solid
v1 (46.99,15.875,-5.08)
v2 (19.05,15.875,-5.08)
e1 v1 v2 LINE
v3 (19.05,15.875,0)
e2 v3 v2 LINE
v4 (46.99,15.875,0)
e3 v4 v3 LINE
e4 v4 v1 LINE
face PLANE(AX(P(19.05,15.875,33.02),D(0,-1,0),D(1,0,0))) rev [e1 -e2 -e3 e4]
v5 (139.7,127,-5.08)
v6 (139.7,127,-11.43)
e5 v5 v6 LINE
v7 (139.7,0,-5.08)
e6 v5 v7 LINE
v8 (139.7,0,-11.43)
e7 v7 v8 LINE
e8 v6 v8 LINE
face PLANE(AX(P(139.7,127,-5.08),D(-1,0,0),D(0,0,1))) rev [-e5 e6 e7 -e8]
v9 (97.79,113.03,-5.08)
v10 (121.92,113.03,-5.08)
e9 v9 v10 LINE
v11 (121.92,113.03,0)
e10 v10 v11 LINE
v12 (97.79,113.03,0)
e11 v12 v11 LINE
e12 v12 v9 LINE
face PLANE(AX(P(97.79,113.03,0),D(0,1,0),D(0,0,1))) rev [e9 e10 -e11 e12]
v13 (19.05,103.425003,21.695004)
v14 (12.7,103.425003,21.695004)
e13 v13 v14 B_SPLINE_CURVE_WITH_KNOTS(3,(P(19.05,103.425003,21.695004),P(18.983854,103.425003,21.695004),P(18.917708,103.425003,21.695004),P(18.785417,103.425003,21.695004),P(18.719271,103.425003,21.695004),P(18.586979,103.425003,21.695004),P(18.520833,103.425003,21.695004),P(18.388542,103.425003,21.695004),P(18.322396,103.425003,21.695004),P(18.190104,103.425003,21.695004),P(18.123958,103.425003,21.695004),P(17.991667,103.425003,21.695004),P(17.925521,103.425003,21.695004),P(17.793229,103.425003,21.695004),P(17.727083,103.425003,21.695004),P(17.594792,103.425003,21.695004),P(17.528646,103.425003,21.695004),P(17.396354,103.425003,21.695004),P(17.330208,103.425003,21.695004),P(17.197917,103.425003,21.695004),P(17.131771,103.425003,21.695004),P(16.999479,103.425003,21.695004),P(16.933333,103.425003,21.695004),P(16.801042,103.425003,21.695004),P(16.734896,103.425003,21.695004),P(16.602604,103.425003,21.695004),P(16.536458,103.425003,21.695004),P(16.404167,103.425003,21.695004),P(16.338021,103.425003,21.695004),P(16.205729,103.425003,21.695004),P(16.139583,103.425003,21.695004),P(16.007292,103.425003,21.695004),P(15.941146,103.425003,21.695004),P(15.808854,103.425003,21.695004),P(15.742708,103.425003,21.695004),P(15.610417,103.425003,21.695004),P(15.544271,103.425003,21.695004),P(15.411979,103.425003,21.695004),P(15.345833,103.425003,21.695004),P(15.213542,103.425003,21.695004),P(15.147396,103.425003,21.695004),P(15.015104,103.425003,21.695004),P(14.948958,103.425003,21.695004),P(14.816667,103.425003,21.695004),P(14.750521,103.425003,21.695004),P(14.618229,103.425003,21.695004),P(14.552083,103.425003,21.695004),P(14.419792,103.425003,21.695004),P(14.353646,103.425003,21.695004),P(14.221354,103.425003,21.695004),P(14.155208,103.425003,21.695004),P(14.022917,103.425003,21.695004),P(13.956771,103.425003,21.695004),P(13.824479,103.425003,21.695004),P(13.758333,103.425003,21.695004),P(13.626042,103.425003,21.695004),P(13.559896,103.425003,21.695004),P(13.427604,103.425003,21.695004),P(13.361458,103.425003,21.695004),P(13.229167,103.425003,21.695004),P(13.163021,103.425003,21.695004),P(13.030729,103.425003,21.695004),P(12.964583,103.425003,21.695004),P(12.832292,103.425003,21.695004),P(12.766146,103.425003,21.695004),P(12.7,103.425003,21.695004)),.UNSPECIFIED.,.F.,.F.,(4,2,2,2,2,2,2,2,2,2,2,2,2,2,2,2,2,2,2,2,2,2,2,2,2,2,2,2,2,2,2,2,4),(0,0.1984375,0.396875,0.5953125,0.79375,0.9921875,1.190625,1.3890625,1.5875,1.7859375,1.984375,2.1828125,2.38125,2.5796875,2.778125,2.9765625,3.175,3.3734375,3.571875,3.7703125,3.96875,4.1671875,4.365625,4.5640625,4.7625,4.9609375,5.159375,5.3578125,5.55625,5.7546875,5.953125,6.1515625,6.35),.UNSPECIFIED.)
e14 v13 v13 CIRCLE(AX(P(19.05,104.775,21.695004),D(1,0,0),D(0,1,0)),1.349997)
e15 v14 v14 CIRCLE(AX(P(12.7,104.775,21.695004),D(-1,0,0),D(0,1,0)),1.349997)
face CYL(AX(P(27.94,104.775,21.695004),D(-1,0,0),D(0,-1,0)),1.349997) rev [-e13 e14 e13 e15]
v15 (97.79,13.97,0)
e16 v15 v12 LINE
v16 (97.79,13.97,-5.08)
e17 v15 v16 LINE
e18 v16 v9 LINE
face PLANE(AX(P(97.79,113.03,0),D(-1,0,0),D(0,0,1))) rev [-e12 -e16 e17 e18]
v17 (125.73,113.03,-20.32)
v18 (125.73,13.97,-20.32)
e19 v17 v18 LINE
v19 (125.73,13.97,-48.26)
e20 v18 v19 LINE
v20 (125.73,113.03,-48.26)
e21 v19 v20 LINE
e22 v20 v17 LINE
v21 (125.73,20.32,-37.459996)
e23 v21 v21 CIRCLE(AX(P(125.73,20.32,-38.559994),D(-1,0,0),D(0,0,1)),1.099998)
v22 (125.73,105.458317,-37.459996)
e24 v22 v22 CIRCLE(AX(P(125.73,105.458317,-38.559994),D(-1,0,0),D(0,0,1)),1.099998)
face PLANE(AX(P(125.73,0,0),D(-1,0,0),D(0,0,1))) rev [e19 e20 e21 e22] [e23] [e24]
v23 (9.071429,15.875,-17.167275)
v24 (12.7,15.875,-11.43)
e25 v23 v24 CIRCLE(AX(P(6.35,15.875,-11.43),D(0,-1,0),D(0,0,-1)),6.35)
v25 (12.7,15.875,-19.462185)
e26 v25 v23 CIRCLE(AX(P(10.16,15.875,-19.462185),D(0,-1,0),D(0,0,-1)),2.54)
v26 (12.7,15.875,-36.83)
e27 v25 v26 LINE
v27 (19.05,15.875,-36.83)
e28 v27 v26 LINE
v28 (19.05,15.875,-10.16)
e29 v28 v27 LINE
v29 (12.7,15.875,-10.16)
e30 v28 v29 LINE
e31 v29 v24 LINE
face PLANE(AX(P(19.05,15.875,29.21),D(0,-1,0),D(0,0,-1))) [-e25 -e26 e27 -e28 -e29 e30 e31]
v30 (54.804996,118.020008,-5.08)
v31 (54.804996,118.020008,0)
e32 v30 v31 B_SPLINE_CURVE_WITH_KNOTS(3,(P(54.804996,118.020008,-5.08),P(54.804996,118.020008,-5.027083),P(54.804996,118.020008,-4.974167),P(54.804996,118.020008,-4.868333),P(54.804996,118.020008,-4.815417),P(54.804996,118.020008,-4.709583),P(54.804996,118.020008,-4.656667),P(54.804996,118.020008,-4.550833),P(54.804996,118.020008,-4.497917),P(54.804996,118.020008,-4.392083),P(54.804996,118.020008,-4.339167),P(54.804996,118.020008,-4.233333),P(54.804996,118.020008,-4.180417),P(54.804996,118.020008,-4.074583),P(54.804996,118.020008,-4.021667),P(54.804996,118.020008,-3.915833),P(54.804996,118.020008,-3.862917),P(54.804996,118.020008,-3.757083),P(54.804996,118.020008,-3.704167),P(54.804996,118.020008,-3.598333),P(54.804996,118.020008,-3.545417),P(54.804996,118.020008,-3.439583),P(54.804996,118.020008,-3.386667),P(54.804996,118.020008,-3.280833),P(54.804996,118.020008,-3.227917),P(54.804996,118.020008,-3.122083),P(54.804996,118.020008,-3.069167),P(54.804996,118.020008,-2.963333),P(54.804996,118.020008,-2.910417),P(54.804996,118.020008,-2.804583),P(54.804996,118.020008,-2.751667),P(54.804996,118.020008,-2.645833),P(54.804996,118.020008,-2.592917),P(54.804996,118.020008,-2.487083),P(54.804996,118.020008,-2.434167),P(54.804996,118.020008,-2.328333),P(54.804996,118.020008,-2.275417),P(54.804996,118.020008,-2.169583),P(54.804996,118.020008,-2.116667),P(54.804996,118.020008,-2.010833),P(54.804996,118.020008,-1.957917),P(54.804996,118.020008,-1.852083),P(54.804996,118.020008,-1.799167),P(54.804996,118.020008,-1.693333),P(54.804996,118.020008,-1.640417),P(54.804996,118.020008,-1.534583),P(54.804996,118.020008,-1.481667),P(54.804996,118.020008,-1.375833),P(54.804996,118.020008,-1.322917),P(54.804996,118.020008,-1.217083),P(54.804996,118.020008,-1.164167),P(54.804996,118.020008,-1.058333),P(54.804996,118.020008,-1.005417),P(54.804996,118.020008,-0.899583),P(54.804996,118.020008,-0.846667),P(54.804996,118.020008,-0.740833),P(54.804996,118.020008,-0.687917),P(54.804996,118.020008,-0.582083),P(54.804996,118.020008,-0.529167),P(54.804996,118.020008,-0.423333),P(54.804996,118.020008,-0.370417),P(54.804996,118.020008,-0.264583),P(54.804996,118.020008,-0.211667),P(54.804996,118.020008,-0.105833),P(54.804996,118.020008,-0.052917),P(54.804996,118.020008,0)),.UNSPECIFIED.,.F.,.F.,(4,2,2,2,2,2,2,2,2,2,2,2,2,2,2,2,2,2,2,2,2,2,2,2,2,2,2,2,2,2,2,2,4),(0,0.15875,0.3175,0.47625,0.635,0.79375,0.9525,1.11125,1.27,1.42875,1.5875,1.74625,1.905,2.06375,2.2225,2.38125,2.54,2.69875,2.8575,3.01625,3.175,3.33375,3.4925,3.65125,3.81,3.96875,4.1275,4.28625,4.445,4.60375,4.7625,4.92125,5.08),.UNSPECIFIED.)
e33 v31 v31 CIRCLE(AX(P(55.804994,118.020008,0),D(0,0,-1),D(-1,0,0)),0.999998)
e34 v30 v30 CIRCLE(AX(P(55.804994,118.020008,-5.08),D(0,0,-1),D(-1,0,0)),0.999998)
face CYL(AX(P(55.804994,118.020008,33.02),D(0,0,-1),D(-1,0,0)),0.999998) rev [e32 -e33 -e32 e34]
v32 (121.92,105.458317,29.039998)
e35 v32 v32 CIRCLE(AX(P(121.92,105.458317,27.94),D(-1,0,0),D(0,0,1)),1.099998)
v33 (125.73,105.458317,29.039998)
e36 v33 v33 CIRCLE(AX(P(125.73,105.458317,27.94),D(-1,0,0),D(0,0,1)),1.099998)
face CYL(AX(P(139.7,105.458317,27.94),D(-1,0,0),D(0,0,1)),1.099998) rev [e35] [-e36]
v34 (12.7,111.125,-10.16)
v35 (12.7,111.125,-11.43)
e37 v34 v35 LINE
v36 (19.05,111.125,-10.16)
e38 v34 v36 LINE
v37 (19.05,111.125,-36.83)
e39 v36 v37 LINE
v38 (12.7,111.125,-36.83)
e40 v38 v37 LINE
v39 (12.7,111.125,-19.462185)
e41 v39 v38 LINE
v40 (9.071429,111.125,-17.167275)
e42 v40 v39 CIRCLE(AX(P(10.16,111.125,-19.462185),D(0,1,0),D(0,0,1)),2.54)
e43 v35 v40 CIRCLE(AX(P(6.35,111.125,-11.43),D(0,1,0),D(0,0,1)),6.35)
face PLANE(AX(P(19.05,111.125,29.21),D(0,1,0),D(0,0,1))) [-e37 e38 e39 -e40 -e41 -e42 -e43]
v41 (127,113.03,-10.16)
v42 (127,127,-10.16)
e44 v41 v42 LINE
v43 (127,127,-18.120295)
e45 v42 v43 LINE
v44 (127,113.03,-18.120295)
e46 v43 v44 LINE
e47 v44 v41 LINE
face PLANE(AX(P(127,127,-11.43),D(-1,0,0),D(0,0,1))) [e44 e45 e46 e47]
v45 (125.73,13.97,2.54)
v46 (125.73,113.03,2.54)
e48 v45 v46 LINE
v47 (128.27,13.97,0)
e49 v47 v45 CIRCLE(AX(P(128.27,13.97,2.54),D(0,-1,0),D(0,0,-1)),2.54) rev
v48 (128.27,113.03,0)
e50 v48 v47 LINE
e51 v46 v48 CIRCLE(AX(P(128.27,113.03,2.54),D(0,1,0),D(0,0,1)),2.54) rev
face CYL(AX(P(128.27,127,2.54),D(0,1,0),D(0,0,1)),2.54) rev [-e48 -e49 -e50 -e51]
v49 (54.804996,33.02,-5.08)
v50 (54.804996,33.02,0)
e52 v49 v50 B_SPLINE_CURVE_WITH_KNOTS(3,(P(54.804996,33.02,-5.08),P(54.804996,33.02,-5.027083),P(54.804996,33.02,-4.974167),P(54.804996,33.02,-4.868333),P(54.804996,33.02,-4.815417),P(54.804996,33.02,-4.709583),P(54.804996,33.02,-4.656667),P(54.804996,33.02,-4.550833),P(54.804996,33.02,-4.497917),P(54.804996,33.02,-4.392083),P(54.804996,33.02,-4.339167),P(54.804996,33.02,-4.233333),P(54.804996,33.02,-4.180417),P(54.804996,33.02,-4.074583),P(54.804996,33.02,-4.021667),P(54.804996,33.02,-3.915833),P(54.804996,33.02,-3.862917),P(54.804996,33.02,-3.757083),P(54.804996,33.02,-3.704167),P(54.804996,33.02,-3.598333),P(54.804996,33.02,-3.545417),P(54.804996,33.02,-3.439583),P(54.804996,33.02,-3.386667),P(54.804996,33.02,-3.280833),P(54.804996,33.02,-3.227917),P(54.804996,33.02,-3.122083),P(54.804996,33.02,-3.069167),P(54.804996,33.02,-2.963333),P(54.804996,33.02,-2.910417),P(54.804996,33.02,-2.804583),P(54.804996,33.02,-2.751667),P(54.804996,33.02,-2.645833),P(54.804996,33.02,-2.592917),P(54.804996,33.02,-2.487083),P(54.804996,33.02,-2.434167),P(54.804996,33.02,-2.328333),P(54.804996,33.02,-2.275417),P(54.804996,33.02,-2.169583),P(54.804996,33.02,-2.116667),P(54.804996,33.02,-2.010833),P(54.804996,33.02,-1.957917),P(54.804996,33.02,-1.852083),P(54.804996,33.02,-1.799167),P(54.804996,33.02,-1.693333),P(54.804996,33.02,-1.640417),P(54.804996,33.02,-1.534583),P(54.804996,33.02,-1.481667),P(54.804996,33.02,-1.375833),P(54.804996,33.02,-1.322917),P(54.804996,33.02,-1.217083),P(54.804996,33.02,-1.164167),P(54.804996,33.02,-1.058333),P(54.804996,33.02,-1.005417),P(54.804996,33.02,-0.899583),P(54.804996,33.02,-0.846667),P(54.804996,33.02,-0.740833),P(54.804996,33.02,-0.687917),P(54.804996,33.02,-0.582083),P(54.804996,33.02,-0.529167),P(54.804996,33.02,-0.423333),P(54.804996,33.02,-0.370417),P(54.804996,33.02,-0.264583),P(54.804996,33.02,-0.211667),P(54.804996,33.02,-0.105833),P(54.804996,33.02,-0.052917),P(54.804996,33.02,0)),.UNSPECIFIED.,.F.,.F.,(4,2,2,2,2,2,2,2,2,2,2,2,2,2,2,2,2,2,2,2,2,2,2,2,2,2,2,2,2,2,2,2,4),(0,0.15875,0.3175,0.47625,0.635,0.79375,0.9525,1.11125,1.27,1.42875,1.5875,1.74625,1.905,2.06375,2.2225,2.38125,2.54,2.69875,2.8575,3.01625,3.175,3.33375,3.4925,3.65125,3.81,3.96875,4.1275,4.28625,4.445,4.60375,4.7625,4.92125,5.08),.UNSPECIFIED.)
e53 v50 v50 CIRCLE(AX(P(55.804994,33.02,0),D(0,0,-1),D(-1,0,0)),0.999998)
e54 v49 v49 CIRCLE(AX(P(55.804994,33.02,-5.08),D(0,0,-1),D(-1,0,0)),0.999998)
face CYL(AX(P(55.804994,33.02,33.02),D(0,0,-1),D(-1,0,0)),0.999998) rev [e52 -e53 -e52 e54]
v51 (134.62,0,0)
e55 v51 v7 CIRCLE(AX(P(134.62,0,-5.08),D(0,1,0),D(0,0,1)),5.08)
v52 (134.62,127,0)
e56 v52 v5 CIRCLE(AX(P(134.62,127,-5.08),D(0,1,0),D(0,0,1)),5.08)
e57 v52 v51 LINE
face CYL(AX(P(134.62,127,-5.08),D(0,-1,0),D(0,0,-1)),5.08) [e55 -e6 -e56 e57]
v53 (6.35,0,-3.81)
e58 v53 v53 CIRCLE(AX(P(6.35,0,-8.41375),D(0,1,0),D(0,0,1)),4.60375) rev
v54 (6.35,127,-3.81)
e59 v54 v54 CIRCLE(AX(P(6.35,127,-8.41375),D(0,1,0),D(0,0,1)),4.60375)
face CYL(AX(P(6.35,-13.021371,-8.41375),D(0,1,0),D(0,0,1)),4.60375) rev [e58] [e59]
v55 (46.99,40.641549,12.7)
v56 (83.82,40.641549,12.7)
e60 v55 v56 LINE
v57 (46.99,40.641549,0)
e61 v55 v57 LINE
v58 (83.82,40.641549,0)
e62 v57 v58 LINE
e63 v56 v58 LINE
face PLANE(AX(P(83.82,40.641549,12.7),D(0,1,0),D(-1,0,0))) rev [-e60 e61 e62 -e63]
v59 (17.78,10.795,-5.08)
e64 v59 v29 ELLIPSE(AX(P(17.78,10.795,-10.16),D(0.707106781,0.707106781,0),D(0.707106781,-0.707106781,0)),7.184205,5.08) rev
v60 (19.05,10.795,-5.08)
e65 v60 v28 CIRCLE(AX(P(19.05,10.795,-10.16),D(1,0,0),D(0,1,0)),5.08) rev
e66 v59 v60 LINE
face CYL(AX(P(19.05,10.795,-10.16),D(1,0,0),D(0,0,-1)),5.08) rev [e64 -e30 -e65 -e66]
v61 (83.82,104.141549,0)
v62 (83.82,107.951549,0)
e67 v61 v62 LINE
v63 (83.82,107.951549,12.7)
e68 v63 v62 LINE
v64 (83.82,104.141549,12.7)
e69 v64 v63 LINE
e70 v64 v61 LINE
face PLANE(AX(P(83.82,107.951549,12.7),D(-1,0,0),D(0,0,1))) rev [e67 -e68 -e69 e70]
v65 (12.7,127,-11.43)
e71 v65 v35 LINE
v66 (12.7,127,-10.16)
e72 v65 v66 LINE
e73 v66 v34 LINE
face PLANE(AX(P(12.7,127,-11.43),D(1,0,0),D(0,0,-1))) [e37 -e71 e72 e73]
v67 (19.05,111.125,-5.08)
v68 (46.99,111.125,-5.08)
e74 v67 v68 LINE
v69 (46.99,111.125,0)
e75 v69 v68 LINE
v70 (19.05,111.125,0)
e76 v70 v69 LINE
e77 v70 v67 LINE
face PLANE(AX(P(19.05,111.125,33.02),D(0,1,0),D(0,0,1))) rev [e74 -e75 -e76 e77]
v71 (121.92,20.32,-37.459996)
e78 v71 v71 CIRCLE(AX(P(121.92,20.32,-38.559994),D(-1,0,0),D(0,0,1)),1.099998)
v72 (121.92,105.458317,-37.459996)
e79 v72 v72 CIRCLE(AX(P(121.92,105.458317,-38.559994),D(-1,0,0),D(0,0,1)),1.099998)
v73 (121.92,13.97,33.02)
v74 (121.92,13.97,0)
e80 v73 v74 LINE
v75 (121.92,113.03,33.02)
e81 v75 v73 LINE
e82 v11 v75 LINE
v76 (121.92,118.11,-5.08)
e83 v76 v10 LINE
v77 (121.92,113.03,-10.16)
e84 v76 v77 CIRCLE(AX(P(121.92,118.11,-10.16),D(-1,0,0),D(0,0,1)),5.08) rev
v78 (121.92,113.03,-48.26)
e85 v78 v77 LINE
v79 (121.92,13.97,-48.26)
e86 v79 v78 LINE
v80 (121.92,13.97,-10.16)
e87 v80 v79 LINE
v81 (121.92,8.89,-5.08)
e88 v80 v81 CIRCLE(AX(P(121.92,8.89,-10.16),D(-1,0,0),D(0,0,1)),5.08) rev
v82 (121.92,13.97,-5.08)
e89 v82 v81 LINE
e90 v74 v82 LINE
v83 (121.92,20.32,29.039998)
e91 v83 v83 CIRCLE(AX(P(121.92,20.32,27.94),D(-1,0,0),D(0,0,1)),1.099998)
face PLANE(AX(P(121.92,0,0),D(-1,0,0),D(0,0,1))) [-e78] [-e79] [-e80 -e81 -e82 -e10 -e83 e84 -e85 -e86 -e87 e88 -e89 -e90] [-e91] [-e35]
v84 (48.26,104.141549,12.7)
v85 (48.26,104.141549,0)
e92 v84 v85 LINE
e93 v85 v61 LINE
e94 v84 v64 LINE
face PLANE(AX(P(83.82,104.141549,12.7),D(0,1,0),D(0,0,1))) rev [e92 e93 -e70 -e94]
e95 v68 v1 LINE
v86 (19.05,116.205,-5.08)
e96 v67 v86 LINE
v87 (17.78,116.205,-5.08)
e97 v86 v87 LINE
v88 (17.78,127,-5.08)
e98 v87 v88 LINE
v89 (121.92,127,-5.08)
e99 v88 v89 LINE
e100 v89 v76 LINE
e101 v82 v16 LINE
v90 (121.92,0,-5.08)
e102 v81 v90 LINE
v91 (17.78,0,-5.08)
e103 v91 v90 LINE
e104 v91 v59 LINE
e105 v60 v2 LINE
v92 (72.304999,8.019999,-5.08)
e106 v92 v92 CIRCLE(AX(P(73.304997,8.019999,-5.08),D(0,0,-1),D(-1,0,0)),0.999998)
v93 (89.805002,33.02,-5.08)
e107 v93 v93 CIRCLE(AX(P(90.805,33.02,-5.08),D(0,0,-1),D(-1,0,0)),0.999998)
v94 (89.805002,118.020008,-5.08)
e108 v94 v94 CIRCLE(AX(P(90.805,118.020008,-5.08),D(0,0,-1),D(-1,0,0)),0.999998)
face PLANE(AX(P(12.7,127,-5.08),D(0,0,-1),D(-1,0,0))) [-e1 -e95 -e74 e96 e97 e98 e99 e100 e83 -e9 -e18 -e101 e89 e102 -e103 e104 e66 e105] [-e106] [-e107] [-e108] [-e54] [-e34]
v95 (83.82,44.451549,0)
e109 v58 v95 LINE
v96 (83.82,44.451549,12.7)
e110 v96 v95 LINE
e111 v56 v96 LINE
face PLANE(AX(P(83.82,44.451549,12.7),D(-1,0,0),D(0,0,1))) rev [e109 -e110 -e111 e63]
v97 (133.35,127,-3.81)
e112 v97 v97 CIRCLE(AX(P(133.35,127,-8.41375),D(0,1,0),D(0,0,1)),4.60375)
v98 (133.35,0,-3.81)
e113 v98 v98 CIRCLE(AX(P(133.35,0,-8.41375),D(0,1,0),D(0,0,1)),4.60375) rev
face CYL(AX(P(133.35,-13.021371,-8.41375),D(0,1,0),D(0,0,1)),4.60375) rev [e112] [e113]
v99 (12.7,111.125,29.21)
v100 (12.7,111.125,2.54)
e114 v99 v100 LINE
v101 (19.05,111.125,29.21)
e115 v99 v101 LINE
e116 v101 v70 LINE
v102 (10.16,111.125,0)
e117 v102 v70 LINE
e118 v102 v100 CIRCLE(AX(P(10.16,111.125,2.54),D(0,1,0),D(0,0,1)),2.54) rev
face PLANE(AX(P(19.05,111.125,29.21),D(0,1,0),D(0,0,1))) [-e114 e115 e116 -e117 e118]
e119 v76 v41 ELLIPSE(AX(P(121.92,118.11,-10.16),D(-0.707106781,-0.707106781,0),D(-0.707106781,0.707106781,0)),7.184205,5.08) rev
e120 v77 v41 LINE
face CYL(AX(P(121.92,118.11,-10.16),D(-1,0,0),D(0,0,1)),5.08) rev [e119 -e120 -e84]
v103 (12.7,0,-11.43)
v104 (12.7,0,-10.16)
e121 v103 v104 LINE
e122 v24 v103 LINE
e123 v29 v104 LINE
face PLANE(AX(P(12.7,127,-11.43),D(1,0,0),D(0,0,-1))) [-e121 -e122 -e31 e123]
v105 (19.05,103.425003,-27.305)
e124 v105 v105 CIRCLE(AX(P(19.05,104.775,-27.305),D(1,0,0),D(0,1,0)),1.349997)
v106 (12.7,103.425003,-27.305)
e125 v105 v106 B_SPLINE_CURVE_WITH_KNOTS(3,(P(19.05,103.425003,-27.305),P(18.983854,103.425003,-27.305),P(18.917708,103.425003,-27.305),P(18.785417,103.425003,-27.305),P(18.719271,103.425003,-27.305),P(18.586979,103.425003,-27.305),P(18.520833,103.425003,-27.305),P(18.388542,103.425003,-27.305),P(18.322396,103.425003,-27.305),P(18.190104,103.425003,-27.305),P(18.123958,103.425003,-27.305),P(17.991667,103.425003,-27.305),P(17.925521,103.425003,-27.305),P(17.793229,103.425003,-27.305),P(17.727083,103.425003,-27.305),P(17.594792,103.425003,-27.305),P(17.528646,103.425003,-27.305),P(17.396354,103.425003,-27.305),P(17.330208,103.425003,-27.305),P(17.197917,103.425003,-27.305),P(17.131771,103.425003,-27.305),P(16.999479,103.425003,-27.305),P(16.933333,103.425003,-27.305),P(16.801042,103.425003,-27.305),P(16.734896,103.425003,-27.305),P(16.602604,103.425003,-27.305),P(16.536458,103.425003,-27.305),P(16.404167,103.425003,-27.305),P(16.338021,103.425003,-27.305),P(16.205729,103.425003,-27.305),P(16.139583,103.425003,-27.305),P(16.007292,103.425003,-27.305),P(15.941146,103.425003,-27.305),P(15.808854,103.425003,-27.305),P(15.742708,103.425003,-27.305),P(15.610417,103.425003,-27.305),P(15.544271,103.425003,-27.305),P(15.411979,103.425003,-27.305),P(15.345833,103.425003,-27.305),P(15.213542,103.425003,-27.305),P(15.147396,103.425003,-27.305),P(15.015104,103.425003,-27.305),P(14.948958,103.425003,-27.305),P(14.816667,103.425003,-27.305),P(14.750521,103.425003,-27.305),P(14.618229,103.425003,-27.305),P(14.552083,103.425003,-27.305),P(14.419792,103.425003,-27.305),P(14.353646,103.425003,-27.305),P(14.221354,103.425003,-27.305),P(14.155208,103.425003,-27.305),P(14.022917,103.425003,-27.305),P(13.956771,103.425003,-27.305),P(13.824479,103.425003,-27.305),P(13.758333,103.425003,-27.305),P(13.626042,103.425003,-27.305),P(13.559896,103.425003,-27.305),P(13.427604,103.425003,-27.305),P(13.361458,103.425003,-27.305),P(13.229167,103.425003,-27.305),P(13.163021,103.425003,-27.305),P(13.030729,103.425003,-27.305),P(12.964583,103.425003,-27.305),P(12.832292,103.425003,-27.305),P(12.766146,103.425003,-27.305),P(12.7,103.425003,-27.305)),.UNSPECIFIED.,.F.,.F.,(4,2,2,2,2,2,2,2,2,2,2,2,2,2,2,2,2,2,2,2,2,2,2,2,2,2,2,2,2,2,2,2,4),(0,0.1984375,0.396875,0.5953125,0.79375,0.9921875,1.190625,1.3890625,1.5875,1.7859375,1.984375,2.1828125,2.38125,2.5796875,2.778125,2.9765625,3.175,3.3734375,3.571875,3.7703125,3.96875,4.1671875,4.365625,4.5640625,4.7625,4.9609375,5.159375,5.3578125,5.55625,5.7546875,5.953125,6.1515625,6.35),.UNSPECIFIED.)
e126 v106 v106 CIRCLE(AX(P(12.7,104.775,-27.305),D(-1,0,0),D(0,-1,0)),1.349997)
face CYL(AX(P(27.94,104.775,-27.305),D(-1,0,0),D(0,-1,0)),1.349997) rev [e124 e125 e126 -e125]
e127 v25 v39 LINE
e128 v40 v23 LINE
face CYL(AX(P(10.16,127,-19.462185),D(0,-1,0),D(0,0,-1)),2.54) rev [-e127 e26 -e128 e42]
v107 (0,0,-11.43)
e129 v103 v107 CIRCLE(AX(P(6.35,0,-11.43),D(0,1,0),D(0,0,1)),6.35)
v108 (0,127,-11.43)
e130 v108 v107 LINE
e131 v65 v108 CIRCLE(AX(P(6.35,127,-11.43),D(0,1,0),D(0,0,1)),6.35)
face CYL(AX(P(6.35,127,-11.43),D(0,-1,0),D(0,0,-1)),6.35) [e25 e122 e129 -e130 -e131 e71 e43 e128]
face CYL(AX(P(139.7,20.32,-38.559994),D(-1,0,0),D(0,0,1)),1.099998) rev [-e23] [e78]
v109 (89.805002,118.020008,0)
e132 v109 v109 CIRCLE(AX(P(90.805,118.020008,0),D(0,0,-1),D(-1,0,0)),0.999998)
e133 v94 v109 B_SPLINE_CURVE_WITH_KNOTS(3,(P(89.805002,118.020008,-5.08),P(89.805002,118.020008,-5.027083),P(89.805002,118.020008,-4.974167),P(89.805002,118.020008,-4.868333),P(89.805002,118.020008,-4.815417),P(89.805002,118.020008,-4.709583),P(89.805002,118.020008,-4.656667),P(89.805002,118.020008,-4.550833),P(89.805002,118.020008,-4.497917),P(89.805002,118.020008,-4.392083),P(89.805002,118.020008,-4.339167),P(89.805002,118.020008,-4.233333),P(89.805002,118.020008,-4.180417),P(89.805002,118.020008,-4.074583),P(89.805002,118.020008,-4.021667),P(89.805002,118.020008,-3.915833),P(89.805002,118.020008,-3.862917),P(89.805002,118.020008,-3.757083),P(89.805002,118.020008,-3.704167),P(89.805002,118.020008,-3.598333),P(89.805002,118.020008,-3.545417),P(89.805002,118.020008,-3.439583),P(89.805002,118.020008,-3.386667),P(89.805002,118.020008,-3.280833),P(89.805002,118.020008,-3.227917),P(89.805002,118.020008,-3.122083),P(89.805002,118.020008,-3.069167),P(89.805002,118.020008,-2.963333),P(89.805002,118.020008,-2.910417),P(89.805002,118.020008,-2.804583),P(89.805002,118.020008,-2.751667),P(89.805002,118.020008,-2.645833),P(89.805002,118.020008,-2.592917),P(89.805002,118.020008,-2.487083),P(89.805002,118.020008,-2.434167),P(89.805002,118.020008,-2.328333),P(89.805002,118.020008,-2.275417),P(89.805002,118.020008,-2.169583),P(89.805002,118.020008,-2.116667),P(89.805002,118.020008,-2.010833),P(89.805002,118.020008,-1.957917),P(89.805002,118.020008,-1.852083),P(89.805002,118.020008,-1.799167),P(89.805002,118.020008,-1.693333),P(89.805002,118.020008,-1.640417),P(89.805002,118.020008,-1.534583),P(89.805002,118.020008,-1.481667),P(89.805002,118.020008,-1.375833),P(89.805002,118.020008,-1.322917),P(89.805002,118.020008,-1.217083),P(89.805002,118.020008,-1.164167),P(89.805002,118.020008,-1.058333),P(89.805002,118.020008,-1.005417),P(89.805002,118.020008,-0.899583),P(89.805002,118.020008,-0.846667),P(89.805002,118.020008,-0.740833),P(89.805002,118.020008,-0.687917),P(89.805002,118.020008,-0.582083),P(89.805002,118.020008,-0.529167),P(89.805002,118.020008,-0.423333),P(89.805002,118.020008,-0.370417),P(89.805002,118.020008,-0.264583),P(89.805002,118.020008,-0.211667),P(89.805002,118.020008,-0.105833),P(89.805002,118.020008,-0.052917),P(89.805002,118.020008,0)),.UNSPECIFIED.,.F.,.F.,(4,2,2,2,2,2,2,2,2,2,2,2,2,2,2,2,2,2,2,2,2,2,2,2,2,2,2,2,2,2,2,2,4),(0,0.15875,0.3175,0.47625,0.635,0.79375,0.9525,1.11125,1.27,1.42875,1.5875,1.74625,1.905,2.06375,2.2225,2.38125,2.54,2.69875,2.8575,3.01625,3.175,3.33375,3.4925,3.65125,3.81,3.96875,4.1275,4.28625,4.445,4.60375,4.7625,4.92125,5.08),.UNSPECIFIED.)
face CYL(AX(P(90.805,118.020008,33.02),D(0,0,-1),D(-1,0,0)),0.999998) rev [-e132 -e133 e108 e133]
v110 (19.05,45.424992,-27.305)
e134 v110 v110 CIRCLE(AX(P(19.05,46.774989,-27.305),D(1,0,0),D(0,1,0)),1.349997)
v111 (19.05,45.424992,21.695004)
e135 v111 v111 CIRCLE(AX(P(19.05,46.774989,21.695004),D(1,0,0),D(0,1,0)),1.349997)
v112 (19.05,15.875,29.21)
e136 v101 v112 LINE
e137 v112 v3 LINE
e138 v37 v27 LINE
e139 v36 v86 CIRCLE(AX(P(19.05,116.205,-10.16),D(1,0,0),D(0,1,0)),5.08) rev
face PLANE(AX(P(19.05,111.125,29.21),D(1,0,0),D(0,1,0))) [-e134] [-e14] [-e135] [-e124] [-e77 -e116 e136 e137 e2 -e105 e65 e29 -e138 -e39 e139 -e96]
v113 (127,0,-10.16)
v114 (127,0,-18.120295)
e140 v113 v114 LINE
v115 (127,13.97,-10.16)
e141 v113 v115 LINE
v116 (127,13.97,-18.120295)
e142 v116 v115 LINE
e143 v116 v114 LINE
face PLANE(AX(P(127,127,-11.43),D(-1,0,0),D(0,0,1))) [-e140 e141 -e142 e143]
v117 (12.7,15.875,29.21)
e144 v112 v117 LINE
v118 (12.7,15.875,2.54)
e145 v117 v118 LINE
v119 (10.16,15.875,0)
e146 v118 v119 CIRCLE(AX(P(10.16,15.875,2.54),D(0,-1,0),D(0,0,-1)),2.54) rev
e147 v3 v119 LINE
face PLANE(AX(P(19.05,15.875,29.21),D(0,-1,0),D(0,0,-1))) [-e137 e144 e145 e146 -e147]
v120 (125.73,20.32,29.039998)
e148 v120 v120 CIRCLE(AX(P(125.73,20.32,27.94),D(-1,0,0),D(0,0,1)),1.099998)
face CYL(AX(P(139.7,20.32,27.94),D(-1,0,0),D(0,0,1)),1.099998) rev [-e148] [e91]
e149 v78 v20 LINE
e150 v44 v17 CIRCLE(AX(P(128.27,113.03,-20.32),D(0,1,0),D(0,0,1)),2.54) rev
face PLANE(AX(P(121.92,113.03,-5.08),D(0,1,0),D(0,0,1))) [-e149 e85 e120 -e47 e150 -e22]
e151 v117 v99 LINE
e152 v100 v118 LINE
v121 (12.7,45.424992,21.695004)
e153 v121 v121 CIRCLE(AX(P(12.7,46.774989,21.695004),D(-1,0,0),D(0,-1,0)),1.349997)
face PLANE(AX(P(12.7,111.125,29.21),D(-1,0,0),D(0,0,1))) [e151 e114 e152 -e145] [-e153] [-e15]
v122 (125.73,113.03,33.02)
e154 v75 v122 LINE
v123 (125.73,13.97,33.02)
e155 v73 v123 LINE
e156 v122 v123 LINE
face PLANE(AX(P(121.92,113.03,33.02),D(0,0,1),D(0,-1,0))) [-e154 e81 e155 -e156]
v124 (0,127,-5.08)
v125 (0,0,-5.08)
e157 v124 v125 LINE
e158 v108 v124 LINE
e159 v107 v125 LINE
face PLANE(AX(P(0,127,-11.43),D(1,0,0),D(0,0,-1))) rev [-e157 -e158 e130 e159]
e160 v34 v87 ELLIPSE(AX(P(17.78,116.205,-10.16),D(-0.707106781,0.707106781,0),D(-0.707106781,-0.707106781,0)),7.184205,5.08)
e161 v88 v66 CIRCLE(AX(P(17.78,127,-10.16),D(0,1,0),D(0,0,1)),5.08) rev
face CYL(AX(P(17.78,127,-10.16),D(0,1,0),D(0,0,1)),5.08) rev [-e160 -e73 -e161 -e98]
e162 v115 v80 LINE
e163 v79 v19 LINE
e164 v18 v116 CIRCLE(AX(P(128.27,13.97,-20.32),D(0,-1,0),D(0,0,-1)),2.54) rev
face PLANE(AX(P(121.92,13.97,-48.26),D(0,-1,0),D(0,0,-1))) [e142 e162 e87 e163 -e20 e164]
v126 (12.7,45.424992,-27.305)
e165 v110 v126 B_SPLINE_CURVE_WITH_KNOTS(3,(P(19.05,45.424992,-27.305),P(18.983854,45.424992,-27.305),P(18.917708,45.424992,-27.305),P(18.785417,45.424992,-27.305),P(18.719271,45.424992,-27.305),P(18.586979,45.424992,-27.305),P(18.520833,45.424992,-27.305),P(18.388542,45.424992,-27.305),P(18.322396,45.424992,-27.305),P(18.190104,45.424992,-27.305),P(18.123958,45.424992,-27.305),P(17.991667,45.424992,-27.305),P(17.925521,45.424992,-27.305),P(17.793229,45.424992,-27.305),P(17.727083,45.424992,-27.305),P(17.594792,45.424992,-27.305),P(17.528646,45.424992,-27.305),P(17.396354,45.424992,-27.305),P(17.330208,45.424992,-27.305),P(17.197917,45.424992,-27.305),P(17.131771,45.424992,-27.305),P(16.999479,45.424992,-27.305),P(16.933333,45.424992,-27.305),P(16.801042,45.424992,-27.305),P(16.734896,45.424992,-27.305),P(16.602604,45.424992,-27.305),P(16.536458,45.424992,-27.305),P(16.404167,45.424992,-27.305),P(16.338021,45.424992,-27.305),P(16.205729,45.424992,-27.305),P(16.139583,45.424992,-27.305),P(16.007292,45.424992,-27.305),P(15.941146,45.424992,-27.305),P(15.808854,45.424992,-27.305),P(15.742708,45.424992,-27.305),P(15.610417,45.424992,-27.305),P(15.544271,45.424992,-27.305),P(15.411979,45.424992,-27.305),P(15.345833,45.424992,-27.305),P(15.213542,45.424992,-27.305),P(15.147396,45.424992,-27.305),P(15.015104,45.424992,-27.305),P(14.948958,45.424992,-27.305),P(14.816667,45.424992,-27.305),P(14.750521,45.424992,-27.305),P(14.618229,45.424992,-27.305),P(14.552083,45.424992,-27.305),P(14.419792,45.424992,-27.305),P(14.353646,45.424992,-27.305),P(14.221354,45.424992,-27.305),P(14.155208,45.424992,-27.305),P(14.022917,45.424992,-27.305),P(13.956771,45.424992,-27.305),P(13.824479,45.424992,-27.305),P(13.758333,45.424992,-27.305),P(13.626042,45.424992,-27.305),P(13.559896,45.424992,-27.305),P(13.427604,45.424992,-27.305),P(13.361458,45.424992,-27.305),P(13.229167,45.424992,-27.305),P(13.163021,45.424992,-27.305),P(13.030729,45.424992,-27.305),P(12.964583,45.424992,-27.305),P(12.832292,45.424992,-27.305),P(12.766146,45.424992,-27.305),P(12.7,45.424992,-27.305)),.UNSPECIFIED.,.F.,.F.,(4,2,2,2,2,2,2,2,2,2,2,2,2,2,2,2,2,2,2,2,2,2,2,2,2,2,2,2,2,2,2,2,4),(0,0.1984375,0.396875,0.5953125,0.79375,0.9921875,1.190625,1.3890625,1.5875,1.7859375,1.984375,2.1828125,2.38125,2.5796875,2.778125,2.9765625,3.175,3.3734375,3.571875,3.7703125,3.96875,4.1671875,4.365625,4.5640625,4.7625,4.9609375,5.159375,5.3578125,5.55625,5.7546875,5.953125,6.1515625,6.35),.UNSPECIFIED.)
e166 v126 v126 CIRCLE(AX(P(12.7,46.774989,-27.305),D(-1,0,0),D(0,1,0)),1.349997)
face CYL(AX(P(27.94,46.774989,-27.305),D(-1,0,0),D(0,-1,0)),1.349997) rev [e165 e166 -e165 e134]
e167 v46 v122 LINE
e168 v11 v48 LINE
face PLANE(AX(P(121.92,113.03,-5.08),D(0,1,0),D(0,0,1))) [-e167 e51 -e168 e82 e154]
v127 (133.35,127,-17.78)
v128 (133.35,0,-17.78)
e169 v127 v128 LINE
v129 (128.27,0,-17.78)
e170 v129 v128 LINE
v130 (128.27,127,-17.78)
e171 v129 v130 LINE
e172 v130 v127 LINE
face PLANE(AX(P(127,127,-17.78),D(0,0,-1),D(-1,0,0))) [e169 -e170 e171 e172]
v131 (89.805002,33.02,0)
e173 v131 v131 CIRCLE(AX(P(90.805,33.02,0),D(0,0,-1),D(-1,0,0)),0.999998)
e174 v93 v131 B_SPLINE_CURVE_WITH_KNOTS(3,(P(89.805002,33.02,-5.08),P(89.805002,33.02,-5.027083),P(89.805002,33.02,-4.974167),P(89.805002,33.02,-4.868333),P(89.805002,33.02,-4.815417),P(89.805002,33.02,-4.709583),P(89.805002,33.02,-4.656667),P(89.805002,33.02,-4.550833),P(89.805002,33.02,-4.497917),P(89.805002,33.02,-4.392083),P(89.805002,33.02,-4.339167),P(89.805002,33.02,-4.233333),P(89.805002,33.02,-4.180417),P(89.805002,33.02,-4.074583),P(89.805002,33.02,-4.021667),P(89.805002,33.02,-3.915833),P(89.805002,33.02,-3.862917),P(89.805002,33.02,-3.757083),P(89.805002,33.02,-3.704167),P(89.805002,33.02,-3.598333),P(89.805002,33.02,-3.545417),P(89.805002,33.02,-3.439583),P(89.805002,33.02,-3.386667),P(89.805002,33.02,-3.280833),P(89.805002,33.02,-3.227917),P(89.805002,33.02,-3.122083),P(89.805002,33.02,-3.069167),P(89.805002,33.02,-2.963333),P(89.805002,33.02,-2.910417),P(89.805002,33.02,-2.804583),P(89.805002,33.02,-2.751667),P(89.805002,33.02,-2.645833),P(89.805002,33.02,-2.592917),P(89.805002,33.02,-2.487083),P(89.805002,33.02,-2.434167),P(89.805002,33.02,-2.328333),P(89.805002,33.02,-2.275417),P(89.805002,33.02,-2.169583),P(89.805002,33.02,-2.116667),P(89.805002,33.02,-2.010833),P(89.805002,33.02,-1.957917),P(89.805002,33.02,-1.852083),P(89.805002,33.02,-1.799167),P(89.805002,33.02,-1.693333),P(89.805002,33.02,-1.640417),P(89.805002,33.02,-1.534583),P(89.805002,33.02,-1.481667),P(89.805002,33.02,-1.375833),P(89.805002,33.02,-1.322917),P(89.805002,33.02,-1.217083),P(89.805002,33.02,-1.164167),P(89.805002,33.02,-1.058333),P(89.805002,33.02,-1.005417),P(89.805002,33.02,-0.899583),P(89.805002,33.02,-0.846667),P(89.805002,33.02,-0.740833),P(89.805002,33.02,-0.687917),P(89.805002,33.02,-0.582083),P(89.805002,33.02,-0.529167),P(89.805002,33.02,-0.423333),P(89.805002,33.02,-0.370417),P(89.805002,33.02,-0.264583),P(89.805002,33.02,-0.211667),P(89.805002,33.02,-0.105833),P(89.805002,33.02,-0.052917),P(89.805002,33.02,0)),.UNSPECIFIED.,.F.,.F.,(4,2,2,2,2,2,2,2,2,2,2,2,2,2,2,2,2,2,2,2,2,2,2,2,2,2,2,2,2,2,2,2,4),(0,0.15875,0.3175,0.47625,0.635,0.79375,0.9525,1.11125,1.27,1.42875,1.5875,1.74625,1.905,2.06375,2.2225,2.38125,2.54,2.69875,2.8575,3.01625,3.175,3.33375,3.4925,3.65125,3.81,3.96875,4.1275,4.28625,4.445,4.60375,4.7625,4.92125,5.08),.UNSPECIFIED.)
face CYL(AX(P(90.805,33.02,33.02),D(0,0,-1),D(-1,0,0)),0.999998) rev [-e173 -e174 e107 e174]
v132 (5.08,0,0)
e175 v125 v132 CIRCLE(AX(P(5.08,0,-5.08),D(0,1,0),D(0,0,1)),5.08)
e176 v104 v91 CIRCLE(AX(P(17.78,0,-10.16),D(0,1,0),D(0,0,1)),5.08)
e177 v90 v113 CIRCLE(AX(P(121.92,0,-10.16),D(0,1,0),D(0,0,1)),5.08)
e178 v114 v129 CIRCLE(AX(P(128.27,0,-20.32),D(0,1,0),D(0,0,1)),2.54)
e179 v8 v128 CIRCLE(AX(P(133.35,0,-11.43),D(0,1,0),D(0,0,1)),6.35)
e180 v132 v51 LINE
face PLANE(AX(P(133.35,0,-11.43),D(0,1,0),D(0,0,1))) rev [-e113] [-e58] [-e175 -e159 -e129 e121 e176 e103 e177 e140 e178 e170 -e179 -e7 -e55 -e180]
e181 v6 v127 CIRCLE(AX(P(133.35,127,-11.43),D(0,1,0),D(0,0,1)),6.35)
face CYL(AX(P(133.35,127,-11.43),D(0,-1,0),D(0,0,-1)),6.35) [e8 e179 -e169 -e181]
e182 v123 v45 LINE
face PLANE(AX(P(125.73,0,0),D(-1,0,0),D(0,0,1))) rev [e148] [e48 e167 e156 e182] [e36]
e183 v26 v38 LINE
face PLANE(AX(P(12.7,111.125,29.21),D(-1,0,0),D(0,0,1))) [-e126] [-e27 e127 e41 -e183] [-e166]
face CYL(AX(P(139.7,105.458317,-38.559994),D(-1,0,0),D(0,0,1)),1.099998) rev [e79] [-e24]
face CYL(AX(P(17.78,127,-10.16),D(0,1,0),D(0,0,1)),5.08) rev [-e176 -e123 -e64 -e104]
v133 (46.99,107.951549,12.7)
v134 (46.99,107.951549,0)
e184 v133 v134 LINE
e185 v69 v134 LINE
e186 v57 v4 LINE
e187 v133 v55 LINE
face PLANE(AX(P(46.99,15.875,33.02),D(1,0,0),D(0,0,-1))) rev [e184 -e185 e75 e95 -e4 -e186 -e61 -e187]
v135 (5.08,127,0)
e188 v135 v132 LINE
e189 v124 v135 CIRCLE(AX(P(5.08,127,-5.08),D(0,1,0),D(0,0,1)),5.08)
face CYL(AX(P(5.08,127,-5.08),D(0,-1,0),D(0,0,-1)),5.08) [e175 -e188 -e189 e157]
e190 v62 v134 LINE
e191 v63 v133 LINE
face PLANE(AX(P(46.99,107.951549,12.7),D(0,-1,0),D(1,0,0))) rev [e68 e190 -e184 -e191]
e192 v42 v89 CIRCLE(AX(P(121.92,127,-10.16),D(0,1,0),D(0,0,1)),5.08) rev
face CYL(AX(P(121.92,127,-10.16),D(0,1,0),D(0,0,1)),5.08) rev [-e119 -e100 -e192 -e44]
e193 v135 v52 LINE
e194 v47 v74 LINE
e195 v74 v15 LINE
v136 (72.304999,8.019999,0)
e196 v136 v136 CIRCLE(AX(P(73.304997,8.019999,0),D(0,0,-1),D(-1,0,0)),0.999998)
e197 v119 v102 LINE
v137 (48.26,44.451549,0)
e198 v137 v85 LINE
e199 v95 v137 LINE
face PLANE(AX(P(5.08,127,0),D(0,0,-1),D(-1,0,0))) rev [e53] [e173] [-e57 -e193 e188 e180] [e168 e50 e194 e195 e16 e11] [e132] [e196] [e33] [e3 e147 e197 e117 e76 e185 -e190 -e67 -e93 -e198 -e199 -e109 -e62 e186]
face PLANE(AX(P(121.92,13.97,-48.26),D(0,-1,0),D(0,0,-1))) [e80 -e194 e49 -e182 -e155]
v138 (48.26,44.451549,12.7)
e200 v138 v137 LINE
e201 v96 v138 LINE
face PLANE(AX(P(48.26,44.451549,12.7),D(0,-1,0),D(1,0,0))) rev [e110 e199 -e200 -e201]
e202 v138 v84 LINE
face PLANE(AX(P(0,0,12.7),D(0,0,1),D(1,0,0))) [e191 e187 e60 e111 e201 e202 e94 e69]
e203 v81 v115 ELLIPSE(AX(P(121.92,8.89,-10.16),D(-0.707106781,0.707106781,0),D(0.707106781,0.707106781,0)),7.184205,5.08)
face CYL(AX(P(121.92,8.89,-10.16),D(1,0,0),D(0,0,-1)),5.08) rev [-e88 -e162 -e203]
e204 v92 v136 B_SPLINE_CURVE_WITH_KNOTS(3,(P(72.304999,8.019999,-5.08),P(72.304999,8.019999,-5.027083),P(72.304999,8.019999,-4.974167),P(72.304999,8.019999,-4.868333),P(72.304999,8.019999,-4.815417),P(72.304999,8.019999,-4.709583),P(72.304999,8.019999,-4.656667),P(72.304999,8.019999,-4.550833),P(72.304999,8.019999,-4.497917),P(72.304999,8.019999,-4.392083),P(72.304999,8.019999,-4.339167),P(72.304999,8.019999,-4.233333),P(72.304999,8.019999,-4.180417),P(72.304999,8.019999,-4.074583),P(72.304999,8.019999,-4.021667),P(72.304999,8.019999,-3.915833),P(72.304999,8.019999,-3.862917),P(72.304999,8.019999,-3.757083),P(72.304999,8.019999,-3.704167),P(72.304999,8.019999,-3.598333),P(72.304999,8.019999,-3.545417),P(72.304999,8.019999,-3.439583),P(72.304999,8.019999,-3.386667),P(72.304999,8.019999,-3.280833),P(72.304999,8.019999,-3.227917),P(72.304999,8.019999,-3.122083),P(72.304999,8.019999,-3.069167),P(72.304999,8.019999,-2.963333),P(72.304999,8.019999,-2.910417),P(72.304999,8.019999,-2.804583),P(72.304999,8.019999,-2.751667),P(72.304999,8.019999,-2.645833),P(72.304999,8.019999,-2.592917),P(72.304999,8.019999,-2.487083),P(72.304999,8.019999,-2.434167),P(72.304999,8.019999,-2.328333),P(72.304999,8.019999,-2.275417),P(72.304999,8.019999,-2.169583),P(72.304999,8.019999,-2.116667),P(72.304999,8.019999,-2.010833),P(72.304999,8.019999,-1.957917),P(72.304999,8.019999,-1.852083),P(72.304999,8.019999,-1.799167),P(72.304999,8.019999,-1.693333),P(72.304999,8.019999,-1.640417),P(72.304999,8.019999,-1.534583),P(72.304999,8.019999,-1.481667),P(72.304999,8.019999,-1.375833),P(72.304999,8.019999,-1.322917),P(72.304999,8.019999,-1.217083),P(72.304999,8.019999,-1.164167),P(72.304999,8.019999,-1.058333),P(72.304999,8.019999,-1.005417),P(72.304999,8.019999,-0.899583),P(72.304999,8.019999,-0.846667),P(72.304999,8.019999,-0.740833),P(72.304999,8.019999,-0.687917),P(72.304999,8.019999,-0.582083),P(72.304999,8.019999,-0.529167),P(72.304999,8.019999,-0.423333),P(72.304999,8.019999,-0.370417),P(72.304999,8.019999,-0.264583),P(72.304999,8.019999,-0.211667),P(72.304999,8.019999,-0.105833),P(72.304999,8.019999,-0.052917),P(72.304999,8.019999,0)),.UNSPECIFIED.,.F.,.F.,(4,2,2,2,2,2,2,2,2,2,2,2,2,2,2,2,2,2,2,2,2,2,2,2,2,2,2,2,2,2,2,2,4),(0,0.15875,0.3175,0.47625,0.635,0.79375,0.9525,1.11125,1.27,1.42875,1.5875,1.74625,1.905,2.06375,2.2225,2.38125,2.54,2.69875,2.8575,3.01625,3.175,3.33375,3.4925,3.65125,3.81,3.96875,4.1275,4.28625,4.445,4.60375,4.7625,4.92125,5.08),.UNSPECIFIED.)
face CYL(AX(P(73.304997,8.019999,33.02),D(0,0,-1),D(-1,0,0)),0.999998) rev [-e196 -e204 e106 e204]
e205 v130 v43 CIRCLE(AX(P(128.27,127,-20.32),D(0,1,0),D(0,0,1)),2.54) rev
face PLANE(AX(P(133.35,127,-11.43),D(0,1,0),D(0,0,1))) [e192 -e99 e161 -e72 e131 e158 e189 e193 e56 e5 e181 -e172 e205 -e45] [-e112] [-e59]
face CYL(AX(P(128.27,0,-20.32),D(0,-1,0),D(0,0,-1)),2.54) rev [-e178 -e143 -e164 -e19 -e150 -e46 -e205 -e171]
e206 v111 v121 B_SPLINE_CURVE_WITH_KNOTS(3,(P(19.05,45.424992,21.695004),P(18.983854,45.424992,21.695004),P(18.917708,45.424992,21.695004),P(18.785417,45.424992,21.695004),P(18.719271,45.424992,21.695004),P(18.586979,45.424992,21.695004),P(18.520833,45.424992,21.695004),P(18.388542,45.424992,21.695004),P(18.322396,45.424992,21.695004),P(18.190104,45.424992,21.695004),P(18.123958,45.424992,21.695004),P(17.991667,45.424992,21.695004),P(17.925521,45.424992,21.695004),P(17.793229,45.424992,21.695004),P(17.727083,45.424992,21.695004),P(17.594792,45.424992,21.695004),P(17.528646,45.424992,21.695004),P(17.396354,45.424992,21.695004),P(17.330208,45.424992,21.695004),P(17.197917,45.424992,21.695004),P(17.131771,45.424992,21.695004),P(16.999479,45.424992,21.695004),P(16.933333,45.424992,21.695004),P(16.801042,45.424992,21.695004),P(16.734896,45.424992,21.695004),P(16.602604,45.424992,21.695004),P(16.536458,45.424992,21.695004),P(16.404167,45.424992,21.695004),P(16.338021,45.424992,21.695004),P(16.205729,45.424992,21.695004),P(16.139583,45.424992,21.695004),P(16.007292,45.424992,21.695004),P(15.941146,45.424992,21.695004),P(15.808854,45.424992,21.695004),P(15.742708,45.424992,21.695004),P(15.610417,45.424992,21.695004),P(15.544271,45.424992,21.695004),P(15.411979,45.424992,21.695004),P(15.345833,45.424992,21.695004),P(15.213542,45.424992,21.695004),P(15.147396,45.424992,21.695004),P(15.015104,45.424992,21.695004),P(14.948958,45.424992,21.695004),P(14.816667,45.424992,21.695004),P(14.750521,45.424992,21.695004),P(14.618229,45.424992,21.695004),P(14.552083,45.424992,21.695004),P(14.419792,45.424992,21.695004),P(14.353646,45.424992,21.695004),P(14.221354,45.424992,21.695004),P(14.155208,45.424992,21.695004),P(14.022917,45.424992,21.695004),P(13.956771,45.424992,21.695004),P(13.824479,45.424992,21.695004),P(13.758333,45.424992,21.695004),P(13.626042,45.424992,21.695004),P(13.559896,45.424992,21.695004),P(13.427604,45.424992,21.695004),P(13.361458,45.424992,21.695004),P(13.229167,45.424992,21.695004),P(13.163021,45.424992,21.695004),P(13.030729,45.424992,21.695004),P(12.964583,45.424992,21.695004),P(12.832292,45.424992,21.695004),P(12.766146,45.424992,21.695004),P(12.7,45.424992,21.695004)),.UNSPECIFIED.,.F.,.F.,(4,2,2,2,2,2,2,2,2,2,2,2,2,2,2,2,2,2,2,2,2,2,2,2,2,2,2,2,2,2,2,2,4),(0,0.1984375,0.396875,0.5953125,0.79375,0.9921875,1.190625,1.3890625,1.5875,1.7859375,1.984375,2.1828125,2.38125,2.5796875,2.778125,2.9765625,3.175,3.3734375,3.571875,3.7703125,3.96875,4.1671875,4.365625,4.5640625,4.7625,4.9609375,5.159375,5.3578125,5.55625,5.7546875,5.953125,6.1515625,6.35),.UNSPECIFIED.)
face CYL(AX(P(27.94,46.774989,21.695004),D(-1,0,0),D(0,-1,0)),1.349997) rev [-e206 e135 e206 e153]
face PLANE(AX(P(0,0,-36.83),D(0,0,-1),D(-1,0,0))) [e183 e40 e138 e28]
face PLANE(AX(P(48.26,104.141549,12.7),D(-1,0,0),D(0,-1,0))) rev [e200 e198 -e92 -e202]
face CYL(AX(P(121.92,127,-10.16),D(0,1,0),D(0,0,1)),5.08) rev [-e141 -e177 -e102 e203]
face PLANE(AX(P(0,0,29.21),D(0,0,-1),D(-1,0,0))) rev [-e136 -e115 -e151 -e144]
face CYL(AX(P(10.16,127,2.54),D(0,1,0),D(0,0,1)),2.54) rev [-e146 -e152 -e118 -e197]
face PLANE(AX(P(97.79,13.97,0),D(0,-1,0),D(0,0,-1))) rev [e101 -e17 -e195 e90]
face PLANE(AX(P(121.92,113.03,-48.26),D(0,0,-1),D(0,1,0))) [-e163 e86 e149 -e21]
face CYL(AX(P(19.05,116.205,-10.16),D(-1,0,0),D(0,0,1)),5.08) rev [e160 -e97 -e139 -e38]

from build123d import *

# Parameters (mm, degrees)
BOSS_EXTRUDE1_DEPTH      = 127
SKETCH3_R                = 4.60374999999995
SKETCH3_R_2              = 4.603749999999996
CUT_EXTRUDE1_DEPTH       = 127
CUT_EXTRUDE10_DEPTH      = 190.225738207042
CUT_EXTRUDE10_DEPTH_BACK = 190.225738207042
SKETCH19_W               = 27.939999999999998
SKETCH19_H               = 99.05999999999997
BOSS_EXTRUDE6_DEPTH      = 3.8099999999999996
CUT_EXTRUDE11_DEPTH      = 183.54455346572246
CUT_EXTRUDE11_DEPTH_BACK = 183.54455346572246
SKETCH23_R               = 1.0999978000000017
SKETCH23_R_2             = 1.0999978000000061
SKETCH23_R_3             = 1.099997799999995
BOSS_EXTRUDE8_DEPTH      = 31.75
BOSS_EXTRUDE8_DEPTH_BACK = 34.29
CUT_EXTRUDE12_DEPTH      = 194.67395901359583
CUT_EXTRUDE12_DEPTH_BACK = 194.67395901359583
CUT_EXTRUDE13_DEPTH      = 194.67395901359583
CUT_EXTRUDE13_DEPTH_BACK = 194.67395901359583
SKETCH32_R               = 0.9999980000000093
SKETCH34_R               = 1.3499972999999863
SKETCH34_R_2             = 1.349997299999995
SKETCH34_R_3             = 1.3499973000000016
CUT_EXTRUDE15_DEPTH      = 15.239999999999998
BOSS_EXTRUDE10_DEPTH     = 12.7
SKETCH36_W               = 1.2700000000000102
SKETCH36_H               = 12.700000000000014
BOSS_EXTRUDE11_DEPTH     = 99.06
FILLET5_R                = 2.54
FILLET6_R                = 2.54
FILLET7_R                = 5.08


with BuildPart() as part:
    # Sketch2 → Boss-Extrude1 (new body)
    with BuildSketch(Plane(origin=(0, 0, 0), x_dir=(1, 0, 0), z_dir=(0, 1, 0))):
        with BuildLine():
            Line((8.7e-16, 11.429999999999996), (8.7e-16, 5.079999999999999))
            ThreePointArc((8.7e-16, 5.079999999999999), (1.4878975515723396, 1.4878975515723383), (5.080000000000001, 0))
            Line((5.080000000000001, 0), (134.61999999999998, 0))
            ThreePointArc((134.61999999999998, 0), (138.21210244842763, 1.4878975515723387), (139.7, 5.08))
            Line((139.7, 5.08), (139.70000000000002, 11.429999999999996))
            ThreePointArc((139.70000000000002, 11.429999999999996), (137.8401280605346, 15.920128060534589), (133.35, 17.78000000000002))
            Line((133.35, 17.78000000000002), (127, 17.780000000000015))
            Line((127, 17.780000000000015), (127, 11.429999999999996))
            Line((127, 11.429999999999996), (127, 5.079999999999999))
            Line((127, 5.079999999999999), (12.699999999999989, 5.08))
            Line((12.699999999999989, 5.08), (12.699999999999989, 11.429999999999996))
            ThreePointArc((12.699999999999989, 11.429999999999996), (6.349999999999994, 17.77999999999999), (8.7e-16, 11.429999999999996))
        make_face()
    extrude(amount=BOSS_EXTRUDE1_DEPTH)

    # Sketch3 → Cut-Extrude1 (cut)
    with BuildSketch(Plane(origin=(0, 127, 0), x_dir=(1, 0, 0), z_dir=(0, 1, 0))):
        with Locations(Location((133.35, 8.41375, 0), (0, 0, 270))):
            Circle(SKETCH3_R)
        with Locations(Location((6.349999999999994, 8.41375, 0), (0, 0, 270))):
            Circle(SKETCH3_R_2)
    extrude(amount=-CUT_EXTRUDE1_DEPTH, mode=Mode.SUBTRACT)

    # Sketch19 → Cut-Extrude10 (cut, two sides: drawn at the far end of the back side and taken through both)
    with BuildSketch(Plane(origin=(4e-17, 0, -5.08), x_dir=(-1, 0, -1e-17), z_dir=(1e-17, 0, -1)).offset(-CUT_EXTRUDE10_DEPTH_BACK)):
        with Locations((-111.76, 63.5)):
            Rectangle(SKETCH19_W, SKETCH19_H)
    extrude(amount=CUT_EXTRUDE10_DEPTH + CUT_EXTRUDE10_DEPTH_BACK, mode=Mode.SUBTRACT)

    # Sketch20 → Boss-Extrude6 (add)
    with BuildSketch(Plane(origin=(125.73, 0, 9.5e-16), x_dir=(1e-17, 0, -1), z_dir=(1, 0, 1e-17))):
        Polygon((5.08, 113.02999999999999), (48.26, 113.02999999999999), (48.26000000000001, 13.97000000000001), (5.08, 13.97000000000001), (-1.06e-15, 13.97000000000001), (-33.01999999999999, 13.97000000000001), (-33.02, 113.02999999999999), (-1.06e-15, 113.02999999999999), align=None)
    extrude(amount=-BOSS_EXTRUDE6_DEPTH)

    # Sketch23 → Cut-Extrude11 (cut, two sides: drawn at the far end of the back side and taken through both)
    with BuildSketch(Plane.ZY.offset(-121.92000000000002).offset(-CUT_EXTRUDE11_DEPTH_BACK)):
        with Locations((27.94, 105.45831715747836)):
            Circle(SKETCH23_R)
        with Locations((27.94, 20.32000000000001)):
            Circle(SKETCH23_R_2)
        with Locations((-38.55999400000001, 20.32000000000001)):
            Circle(SKETCH23_R_3)
        with Locations((-38.55999400000001, 105.45831715747836)):
            Circle(SKETCH23_R_3)
    extrude(amount=CUT_EXTRUDE11_DEPTH + CUT_EXTRUDE11_DEPTH_BACK, mode=Mode.SUBTRACT)

    # Sketch26 → Boss-Extrude8 (add, two sides: drawn at the far end of the back side and taken through both)
    with BuildSketch(Plane(origin=(4e-17, 0, -5.08), x_dir=(-1, 0, -1e-17), z_dir=(1e-17, 0, -1)).offset(-BOSS_EXTRUDE8_DEPTH_BACK)):
        Polygon((-19.049999999999976, 111.125), (-12.699999999999976, 111.125), (-12.699999999999976, 15.875), (-19.049999999999955, 15.875), align=None)
    extrude(amount=BOSS_EXTRUDE8_DEPTH + BOSS_EXTRUDE8_DEPTH_BACK)

    # Sketch27 → Cut-Extrude12 (cut, two sides: drawn at the far end of the back side and taken through both)
    with BuildSketch(Plane(origin=(4e-17, 0, -5.08), x_dir=(-1, 0, -1e-17), z_dir=(1e-17, 0, -1)).offset(-CUT_EXTRUDE12_DEPTH_BACK)):
        Polygon((-19.049999999999976, 15.875), (-46.989999999999974, 15.874999999999996), (-46.989999999999974, 111.125), (-19.049999999999976, 111.125), align=None)
    extrude(amount=CUT_EXTRUDE12_DEPTH + CUT_EXTRUDE12_DEPTH_BACK, mode=Mode.SUBTRACT)

    # Sketch32 → Cut-Extrude13 (cut, two sides: drawn at the far end of the back side and taken through both)
    with BuildSketch(Plane(origin=(4e-17, 0, -5.08), x_dir=(-1, 0, -1e-17), z_dir=(1e-17, 0, -1)).offset(-CUT_EXTRUDE13_DEPTH_BACK)):
        with Locations((-90.80499999999999, 118.02000779999999)):
            Circle(SKETCH32_R)
        with Locations((-55.8049938, 118.02000779999999)):
            Circle(SKETCH32_R)
        with Locations((-55.8049938, 33.02)):
            Circle(SKETCH32_R)
        with Locations((-90.80499999999999, 33.02)):
            Circle(SKETCH32_R)
        with Locations((-73.3049969, 8.019999200000003)):
            Circle(SKETCH32_R)
    extrude(amount=CUT_EXTRUDE13_DEPTH + CUT_EXTRUDE13_DEPTH_BACK, mode=Mode.SUBTRACT)

    # Sketch34 → Cut-Extrude15 (cut)
    with BuildSketch(Plane.ZY.offset(-12.699999999999976)):
        with Locations(Location((-27.30500000000001, 104.775, 0), (0, 0, 270))):
            Circle(SKETCH34_R)
        with Locations(Location((21.695003599999986, 104.775, 0), (0, 0, 270))):
            Circle(SKETCH34_R)
        with Locations(Location((21.695003599999993, 46.774989000000026, 0), (0, 0, 270))):
            Circle(SKETCH34_R_2)
        with Locations(Location((-27.305000000000003, 46.77498900000001, 0), (0, 0, 270))):
            Circle(SKETCH34_R_3)
    extrude(amount=-CUT_EXTRUDE15_DEPTH, mode=Mode.SUBTRACT)

    # Sketch35 → Boss-Extrude10 (add)
    with BuildSketch(Plane.XY):
        Polygon((48.25999999999998, 104.14154915842353), (48.259999999999984, 44.45154915842352), (83.81999999999998, 44.451549158423525), (83.81999999999998, 40.64154915842352), (46.989999999999974, 40.641549158423516), (46.989999999999974, 107.95154915842352), (83.81999999999996, 107.95154915842353), (83.81999999999996, 104.14154915842353), align=None)
    extrude(amount=BOSS_EXTRUDE10_DEPTH)

    # Sketch36 → Boss-Extrude11 (add)
    with BuildSketch(Plane.XZ.offset(-13.97000000000001)):
        with Locations((126.36500000000001, -11.430000000000009)):
            Rectangle(SKETCH36_W, SKETCH36_H)
    extrude(amount=-BOSS_EXTRUDE11_DEPTH)

    # Fillet5
    fillet5_edges = [part.edges().sort_by_distance(p)[0] for p in [
        (12.699999999999989, 63.5, -11.429999999999996),
    ]]
    fillet(fillet5_edges, radius=FILLET5_R)

    # Fillet6
    fillet6_edges = [part.edges().sort_by_distance(p)[0] for p in [
        (125.73, 63.5, 0),
        (12.699999999999976, 63.5, 0),
        (125.73, 63.500000000000014, -17.780000000000015),
    ]]
    fillet(fillet6_edges, radius=FILLET6_R)

    # Fillet7
    fillet7_edges = [part.edges().sort_by_distance(p)[0] for p in [
        (12.699999999999989, 7.9375, -5.08),
        (15.874999999999986, 111.125, -5.08),
        (15.874999999999972, 15.875, -5.08),
        (12.699999999999989, 119.0625, -5.08),
        (127, 120.01500000000001, -5.079999999999999),
        (127, 6.985000000000005, -5.079999999999999),
        (124.46000000000001, 13.97000000000001, -5.08),
        (124.46000000000001, 113.03, -5.08),
    ]]
    fillet(fillet7_edges, radius=FILLET7_R - 0.0001)  # a hair under: the kernel refuses the full size


solid = part.part
